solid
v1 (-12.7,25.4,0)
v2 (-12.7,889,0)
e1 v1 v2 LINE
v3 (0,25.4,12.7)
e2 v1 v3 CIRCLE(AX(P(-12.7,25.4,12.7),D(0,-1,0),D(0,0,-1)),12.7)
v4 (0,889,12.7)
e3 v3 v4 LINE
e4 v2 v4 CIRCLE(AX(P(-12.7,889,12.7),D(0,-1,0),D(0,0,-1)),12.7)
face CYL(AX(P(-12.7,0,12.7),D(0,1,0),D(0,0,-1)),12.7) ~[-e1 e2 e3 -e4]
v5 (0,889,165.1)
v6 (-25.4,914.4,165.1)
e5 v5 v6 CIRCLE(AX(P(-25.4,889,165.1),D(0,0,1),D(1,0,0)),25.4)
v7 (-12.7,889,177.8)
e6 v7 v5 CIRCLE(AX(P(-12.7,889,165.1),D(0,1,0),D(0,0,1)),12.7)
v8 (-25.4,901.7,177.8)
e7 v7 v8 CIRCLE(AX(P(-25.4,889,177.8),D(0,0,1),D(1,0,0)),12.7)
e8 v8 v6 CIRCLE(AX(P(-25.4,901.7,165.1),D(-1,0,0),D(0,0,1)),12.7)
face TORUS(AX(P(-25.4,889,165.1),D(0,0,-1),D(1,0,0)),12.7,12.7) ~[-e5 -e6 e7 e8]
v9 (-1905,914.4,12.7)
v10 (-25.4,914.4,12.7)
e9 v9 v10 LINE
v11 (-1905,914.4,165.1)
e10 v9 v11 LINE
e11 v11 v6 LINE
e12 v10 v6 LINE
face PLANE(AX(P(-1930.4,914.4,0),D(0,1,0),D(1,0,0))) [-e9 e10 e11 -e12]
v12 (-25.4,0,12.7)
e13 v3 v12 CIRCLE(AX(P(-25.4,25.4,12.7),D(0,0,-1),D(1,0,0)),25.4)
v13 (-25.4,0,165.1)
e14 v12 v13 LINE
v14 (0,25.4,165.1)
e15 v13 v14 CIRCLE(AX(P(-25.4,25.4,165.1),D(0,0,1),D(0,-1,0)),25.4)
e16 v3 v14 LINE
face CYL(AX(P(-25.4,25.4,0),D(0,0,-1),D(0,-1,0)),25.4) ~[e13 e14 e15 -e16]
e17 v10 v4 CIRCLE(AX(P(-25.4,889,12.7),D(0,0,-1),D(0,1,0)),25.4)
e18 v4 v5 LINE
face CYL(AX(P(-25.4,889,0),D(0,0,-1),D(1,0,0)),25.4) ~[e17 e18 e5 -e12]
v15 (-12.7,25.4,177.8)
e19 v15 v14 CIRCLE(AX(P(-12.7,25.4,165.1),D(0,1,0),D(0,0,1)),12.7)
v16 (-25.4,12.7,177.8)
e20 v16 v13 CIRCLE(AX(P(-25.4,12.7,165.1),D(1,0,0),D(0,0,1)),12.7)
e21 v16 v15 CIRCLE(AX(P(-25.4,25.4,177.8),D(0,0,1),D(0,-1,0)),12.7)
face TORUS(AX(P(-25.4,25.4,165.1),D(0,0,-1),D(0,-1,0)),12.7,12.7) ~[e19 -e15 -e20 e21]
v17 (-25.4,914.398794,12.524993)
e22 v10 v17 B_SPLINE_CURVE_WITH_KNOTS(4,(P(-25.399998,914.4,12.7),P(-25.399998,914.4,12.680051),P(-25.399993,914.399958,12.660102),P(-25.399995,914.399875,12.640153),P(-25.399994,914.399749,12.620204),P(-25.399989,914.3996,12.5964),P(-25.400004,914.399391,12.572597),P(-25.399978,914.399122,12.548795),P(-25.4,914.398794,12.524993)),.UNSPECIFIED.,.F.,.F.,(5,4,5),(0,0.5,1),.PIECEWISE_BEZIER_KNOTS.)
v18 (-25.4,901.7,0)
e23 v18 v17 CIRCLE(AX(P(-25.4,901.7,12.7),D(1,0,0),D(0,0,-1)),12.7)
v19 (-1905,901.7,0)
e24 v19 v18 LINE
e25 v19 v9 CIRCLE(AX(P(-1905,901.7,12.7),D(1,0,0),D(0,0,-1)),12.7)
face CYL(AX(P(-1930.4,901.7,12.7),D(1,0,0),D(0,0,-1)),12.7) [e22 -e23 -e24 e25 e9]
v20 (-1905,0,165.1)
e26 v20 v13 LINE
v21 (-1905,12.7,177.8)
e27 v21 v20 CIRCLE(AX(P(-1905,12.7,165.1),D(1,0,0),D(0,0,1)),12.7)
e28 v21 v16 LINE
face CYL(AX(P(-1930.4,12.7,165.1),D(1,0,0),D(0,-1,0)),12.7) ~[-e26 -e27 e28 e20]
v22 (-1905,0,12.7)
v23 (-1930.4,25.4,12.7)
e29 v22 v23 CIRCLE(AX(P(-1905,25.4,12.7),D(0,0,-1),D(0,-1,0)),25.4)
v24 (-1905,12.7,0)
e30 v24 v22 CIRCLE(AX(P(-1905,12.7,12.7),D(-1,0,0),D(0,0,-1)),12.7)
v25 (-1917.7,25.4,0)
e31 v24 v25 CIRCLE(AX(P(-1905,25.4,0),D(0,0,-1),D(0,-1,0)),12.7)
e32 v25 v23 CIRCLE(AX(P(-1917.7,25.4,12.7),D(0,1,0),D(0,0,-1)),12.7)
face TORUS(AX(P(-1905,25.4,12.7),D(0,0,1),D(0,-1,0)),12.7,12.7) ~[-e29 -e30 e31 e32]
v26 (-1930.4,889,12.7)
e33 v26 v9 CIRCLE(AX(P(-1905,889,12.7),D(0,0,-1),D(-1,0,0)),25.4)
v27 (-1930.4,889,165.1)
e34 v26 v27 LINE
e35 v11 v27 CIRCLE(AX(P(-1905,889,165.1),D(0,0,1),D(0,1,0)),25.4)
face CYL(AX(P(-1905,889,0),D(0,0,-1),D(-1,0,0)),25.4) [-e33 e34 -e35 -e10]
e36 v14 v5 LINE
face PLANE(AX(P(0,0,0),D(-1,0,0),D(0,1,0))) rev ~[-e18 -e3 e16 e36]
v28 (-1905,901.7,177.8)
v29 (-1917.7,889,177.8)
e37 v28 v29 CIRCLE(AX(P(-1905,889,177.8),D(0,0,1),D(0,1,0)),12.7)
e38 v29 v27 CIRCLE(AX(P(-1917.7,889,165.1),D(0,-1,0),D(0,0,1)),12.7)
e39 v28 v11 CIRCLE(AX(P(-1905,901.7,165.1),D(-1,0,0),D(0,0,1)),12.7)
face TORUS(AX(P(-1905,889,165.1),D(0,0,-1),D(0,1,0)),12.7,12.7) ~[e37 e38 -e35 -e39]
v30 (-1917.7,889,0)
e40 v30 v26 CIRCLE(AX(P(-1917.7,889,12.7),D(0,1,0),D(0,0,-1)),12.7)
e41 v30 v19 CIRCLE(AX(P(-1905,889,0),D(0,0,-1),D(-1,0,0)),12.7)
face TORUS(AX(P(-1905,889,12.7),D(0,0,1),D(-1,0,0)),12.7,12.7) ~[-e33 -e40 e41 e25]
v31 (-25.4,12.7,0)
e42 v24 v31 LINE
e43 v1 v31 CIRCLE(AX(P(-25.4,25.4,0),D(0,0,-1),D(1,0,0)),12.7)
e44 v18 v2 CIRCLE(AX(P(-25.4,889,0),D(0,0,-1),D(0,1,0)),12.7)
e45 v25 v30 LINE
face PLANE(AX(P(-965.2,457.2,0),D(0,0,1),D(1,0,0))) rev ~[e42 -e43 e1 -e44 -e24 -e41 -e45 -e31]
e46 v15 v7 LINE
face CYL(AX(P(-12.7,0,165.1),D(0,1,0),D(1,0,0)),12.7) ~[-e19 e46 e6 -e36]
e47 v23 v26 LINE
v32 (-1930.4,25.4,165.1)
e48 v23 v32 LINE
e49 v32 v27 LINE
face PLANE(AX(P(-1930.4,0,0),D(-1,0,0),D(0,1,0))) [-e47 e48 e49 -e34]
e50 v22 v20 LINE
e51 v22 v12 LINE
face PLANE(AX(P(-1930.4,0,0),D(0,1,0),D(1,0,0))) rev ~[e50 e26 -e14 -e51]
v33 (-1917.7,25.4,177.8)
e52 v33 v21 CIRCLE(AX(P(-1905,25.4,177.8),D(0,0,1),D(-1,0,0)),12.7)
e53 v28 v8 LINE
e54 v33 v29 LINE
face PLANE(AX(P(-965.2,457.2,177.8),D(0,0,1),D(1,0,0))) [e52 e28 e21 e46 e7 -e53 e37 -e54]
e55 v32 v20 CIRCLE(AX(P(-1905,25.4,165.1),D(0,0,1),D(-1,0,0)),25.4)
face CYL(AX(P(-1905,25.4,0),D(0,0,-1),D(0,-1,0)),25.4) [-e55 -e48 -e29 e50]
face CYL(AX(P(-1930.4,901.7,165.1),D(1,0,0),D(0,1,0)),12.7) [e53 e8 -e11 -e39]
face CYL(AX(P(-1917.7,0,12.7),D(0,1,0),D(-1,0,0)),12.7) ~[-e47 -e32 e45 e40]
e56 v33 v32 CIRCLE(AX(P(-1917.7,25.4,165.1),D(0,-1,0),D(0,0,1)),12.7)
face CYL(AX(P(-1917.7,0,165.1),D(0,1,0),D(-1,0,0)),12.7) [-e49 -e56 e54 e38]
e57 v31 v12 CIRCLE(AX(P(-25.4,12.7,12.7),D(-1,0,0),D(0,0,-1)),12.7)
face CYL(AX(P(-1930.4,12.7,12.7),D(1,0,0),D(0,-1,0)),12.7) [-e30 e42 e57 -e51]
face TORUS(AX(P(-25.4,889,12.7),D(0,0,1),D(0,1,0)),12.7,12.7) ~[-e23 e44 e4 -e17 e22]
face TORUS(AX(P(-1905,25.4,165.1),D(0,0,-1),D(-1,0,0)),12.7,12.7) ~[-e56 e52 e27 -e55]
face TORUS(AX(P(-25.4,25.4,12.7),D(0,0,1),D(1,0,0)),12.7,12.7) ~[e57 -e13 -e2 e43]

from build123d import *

# Parameters (mm, degrees)
F0_W         = 1930.4
F0_H         = 914.4
F1_DEPTH     = 177.8
F2_R         = 12.7
F3_R         = 12.7
F4_T1_DEPTH  = 177.8
F4_T4_ANGLE  = 90
F4_T6_ANGLE  = 90
F4_T8_ANGLE  = 90
F4_T10_ANGLE = 90
F4_T12_ANGLE = 90
F4_T14_ANGLE = 90
F4_T16_ANGLE = 90
F4_T18_ANGLE = 90


# Not quite as in the source:
# - a fillet or chamfer that OpenCascade refuses, or shapes differently, is made with other operations: its cross-section is extruded or revolved along the edge and cut away or added


with BuildPart() as f1:
    # F0 (on Top) → F1 (new body)
    with BuildSketch(Plane.XY):
        with Locations((-965.2, 457.2)):
            Rectangle(F0_W, F0_H)
    extrude(amount=F1_DEPTH)

    # F2
    f2_edges = [f1.edges().sort_by_distance(p)[0] for p in [
        (-965.2, 0, 177.8),
        (0, 457.2, 177.8),
        (-965.2, 914.4, 177.8),
        (-1930.4, 457.2, 177.8),
    ]]
    fillet(f2_edges, radius=F2_R)

    # F3
    f3_edges = [f1.edges().sort_by_distance(p)[0] for p in [
        (-965.2, 0, 0),
        (0, 457.2, 0),
        (-965.2, 914.4, 0),
        (-1930.4, 457.2, 0),
    ]]
    fillet(f3_edges, radius=F3_R)

    # F4: fillet of radius 25.4 on 4 edges, made by hand

    # F4_s2 → F4_t1 (cut)
    with BuildSketch(Plane.XY):
        with BuildLine():
            ThreePointArc((-1930.4, 889), (-1922.9605122421, 906.9605122421), (-1905, 914.4))
            Line((-1905, 914.4), (-1930.4, 914.4))
            Line((-1930.4, 914.4), (-1930.4, 889))
        make_face()
        with BuildLine():
            ThreePointArc((-1905, 0), (-1922.9605122421, 7.4394877579), (-1930.4, 25.4))
            Line((-1930.4, 25.4), (-1930.4, 0))
            Line((-1930.4, 0), (-1905, 0))
        make_face()
        with BuildLine():
            ThreePointArc((-25.4, 0), (-7.4394877579, 7.4394877579), (0, 25.4))
            Line((0, 25.4), (0, 0))
            Line((0, 0), (-25.4, 0))
        make_face()
        with BuildLine():
            ThreePointArc((0, 889), (-7.4394877579, 906.9605122421), (-25.4, 914.4))
            Line((-25.4, 914.4), (0, 914.4))
            Line((0, 914.4), (0, 889))
        make_face()
    extrude(amount=F4_T1_DEPTH, mode=Mode.SUBTRACT)

    # F4_s3 → F4_t4 (revolve, cut)
    with BuildSketch(Plane.YZ.offset(-25.4)):
        with BuildLine():
            ThreePointArc((901.7, 0), (910.6802561211, 3.7197438789), (914.4, 12.7))
            Line((914.4, 12.7), (914.4, 0))
            Line((914.4, 0), (901.7, 0))
        make_face()
    revolve(axis=Axis((-25.4, 889, 0), (0, 0, -1)), revolution_arc=F4_T4_ANGLE, mode=Mode.SUBTRACT)

    # F4_s5 → F4_t6 (revolve, cut)
    with BuildSketch(Plane.XZ.offset(-889)):
        with BuildLine():
            ThreePointArc((-12.7, 177.8), (-3.7197438789, 174.0802561211), (0, 165.1))
            Line((0, 165.1), (0, 177.8))
            Line((0, 177.8), (-12.7, 177.8))
        make_face()
    revolve(axis=Axis((-25.4, 889, 177.8), (0, 0, 1)), revolution_arc=F4_T6_ANGLE, mode=Mode.SUBTRACT)

    # F4_s7 → F4_t8 (revolve, cut)
    with BuildSketch(Plane.XZ.offset(-25.4)):
        with BuildLine():
            ThreePointArc((-12.7, 0), (-3.7197438789, 3.7197438789), (0, 12.7))
            Line((0, 12.7), (0, 0))
            Line((0, 0), (-12.7, 0))
        make_face()
    revolve(axis=Axis((-25.4, 25.4, 0), (0, 0, -1)), revolution_arc=F4_T8_ANGLE, mode=Mode.SUBTRACT)

    # F4_s9 → F4_t10 (revolve, cut)
    with BuildSketch(Plane.YZ.offset(-25.4)):
        with BuildLine():
            ThreePointArc((12.7, 177.8), (3.7197438789, 174.0802561211), (0, 165.1))
            Line((0, 165.1), (0, 177.8))
            Line((0, 177.8), (12.7, 177.8))
        make_face()
    revolve(axis=Axis((-25.4, 25.4, 177.8), (0, 0, 1)), revolution_arc=F4_T10_ANGLE, mode=Mode.SUBTRACT)

    # F4_s11 → F4_t12 (revolve, cut)
    with BuildSketch(Plane.YZ.offset(-1905)):
        with BuildLine():
            ThreePointArc((12.7, 0), (3.7197438789, 3.7197438789), (0, 12.7))
            Line((0, 12.7), (0, 0))
            Line((0, 0), (12.7, 0))
        make_face()
    revolve(axis=Axis((-1905, 25.4, 0), (0, 0, -1)), revolution_arc=F4_T12_ANGLE, mode=Mode.SUBTRACT)

    # F4_s13 → F4_t14 (revolve, cut)
    with BuildSketch(Plane.XZ.offset(-25.4)):
        with BuildLine():
            ThreePointArc((-1917.7, 177.8), (-1926.6802561211, 174.0802561211), (-1930.4, 165.1))
            Line((-1930.4, 165.1), (-1930.4, 177.8))
            Line((-1930.4, 177.8), (-1917.7, 177.8))
        make_face()
    revolve(axis=Axis((-1905, 25.4, 177.8), (0, 0, 1)), revolution_arc=F4_T14_ANGLE, mode=Mode.SUBTRACT)

    # F4_s15 → F4_t16 (revolve, cut)
    with BuildSketch(Plane.XZ.offset(-889)):
        with BuildLine():
            ThreePointArc((-1917.7, 0), (-1926.6802561211, 3.7197438789), (-1930.4, 12.7))
            Line((-1930.4, 12.7), (-1930.4, 0))
            Line((-1930.4, 0), (-1917.7, 0))
        make_face()
    revolve(axis=Axis((-1905, 889, 0), (0, 0, -1)), revolution_arc=F4_T16_ANGLE, mode=Mode.SUBTRACT)

    # F4_s17 → F4_t18 (revolve, cut)
    with BuildSketch(Plane.YZ.offset(-1905)):
        with BuildLine():
            ThreePointArc((901.7, 177.8), (910.6802561211, 174.0802561211), (914.4, 165.1))
            Line((914.4, 165.1), (914.4, 177.8))
            Line((914.4, 177.8), (901.7, 177.8))
        make_face()
    revolve(axis=Axis((-1905, 889, 177.8), (0, 0, 1)), revolution_arc=F4_T18_ANGLE, mode=Mode.SUBTRACT)


solid = f1.part
